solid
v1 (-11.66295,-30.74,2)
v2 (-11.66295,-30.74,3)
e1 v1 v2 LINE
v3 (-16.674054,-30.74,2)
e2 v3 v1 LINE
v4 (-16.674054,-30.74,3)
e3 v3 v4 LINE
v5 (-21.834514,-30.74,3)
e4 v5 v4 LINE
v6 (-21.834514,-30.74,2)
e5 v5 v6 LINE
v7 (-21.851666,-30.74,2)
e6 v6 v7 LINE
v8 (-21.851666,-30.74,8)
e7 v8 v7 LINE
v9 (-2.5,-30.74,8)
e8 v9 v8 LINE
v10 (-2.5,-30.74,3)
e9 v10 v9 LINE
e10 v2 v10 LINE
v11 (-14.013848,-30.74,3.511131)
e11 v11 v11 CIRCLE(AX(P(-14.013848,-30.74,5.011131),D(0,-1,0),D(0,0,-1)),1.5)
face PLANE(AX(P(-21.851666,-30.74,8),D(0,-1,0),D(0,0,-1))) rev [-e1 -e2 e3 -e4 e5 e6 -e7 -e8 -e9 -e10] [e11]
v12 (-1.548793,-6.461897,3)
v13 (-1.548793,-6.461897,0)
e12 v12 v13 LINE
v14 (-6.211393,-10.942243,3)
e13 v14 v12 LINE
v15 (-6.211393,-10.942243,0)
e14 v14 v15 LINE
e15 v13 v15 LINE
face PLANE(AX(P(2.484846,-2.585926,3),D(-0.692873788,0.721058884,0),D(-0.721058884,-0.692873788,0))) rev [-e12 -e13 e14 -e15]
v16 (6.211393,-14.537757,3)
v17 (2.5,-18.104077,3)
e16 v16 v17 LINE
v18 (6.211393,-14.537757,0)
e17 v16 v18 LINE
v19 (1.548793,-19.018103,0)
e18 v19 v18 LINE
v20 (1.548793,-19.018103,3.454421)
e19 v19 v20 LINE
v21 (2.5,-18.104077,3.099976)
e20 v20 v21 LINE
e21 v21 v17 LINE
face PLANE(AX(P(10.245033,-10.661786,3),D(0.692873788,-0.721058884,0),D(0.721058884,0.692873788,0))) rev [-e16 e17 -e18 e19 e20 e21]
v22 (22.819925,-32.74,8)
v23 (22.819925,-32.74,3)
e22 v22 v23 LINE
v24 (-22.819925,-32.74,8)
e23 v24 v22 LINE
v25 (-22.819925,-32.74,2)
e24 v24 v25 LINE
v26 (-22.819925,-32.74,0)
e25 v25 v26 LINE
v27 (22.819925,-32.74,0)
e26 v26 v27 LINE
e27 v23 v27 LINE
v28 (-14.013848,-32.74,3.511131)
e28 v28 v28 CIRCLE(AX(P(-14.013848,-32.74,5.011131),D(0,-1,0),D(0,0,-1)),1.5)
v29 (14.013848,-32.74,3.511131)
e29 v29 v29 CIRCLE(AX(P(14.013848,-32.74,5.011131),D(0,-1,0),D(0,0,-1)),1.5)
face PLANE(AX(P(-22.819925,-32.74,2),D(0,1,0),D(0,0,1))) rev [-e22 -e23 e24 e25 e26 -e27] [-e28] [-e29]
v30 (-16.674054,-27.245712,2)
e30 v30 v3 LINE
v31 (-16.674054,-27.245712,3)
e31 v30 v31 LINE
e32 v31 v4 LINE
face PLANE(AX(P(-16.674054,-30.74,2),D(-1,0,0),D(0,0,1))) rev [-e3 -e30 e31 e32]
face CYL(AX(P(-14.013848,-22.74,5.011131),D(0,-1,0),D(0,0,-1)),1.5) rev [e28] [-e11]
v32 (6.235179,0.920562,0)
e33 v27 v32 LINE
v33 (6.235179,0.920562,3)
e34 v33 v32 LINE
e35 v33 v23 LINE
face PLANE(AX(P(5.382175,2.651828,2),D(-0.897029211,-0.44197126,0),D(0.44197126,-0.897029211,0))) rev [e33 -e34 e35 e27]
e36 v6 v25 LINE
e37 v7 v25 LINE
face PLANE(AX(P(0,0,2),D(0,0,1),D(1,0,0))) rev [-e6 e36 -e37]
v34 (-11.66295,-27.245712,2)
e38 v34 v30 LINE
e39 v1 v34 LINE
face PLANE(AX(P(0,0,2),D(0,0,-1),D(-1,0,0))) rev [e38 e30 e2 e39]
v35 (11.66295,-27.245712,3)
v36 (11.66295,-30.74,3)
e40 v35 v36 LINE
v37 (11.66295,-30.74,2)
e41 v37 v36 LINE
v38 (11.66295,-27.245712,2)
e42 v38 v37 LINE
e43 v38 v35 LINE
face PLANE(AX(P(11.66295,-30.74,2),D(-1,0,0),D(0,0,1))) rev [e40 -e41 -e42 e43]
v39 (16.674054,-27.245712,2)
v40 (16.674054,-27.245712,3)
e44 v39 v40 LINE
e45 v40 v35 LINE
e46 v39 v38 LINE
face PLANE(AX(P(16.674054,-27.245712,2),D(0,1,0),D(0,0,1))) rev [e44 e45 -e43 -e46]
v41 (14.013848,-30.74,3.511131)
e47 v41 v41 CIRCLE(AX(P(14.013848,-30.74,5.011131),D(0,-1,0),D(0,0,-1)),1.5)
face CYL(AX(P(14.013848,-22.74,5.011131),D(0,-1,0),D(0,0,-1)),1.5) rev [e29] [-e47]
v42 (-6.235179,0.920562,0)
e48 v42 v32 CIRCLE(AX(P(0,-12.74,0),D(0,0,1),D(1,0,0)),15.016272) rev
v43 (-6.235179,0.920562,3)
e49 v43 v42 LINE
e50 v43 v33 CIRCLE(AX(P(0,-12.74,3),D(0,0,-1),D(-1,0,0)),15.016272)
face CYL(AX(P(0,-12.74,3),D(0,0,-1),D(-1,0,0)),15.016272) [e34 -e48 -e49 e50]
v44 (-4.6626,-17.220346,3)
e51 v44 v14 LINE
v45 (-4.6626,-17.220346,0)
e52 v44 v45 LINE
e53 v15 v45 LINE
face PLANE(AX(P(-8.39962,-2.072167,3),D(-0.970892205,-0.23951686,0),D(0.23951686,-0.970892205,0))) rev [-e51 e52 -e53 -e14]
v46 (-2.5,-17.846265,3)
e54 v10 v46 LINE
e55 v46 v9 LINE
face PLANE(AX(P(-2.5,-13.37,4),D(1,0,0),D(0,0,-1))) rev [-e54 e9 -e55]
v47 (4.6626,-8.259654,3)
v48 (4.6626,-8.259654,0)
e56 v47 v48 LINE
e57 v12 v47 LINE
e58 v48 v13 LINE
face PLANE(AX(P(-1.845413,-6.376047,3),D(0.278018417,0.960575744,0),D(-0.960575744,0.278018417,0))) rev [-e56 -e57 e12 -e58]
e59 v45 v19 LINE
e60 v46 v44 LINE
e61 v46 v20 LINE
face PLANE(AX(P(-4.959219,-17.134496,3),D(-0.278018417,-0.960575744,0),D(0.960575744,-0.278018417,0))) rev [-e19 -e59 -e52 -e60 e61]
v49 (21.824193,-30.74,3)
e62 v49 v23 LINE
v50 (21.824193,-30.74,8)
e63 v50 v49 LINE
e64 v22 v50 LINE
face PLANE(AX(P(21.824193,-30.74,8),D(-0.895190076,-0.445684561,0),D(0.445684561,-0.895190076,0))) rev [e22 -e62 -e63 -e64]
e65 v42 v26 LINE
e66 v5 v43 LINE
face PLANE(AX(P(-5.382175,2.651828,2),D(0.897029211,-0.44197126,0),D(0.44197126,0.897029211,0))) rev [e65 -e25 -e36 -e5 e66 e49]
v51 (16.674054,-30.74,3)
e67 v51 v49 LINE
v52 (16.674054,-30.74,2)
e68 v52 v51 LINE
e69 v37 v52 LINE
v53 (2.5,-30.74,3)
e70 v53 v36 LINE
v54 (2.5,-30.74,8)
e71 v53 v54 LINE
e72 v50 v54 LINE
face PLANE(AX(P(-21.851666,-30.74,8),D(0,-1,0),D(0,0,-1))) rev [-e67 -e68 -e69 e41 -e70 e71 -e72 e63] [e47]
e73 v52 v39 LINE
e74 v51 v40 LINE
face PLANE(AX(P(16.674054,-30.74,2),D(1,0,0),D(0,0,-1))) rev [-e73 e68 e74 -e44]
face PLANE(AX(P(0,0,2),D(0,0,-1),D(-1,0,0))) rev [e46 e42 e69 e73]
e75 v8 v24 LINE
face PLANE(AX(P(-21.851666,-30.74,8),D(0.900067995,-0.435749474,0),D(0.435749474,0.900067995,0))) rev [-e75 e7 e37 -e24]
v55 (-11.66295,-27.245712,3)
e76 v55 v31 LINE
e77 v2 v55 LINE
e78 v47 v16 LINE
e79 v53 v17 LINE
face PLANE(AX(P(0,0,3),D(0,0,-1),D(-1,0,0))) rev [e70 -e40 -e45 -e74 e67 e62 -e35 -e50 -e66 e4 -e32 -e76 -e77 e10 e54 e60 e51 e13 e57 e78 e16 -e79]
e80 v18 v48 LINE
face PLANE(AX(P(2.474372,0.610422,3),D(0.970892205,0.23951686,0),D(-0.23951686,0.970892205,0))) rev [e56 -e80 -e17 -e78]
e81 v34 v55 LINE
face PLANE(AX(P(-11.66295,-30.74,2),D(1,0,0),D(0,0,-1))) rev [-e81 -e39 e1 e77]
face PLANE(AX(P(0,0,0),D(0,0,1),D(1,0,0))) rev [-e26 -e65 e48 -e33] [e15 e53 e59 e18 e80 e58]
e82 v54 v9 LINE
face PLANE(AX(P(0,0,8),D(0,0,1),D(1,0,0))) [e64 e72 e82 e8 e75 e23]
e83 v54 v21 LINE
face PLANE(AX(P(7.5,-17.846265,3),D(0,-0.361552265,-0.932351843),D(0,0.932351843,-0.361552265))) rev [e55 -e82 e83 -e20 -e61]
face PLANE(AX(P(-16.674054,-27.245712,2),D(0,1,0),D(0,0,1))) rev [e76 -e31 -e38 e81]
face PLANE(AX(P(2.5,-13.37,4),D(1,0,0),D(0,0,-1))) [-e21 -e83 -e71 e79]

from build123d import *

# Parameters (mm, degrees)
SKETCH_1_R               = 3
EXTRUDE_1_DEPTH          = 2
EXTRUDE_2_DEPTH          = 6
RIB_2_REACH              = 42.702
SKETCH_3_WALL_W          = 109.004825052
SKETCH_3_WALL_H          = 5
SKETCH_4_R               = 4.101413307
EXTRUDE_3_DEPTH          = 2
EXTRUDE_4_DEPTH          = 3
CUT_EXTRUDE_1_DEPTH      = 41.220101475
CUT_EXTRUDE_1_DEPTH_BACK = 41.220101475
CUT_EXTRUDE_START        = -10
CUT_EXTRUDE_2_DEPTH      = 10
CUT_EXTRUDE_3_DEPTH      = 10
SKETCH_14_R              = 1.5
CUT_EXTRUDE_4_DEPTH      = 10
SKETCH_15_W              = 5.01110436
SKETCH_15_H              = 3.494287521
CUT_EXTRUDE_5_DEPTH      = 1


with BuildPart() as part:
    # 草图1 → 凸台-拉伸1 (new body)
    with BuildSketch(Plane.XY):
        with BuildLine():
            Line((-5.382175267, 2.651827558), (-22.819924686, -32.74))
            Line((-22.819924686, -32.74), (22.819924686, -32.74))
            Line((22.819924686, -32.74), (5.382175267, 2.651827558))
            ThreePointArc((5.382175267, 2.651827558), (0, 6), (-5.382175267, 2.651827558))
        make_face()
        Circle(SKETCH_1_R, mode=Mode.SUBTRACT)
    extrude(amount=EXTRUDE_1_DEPTH)

    # 草图2 → 凸台-拉伸2 (add)
    with BuildSketch(Plane.XY.offset(2)):
        Polygon((21.824193002, -30.74), (22.819924686, -32.74), (-22.819924686, -32.74), (-21.851665672, -30.74), align=None)
    extrude(amount=EXTRUDE_2_DEPTH)

    # 草图3 wall → 筋2 (add, up to next)
    with BuildSketch(Plane(origin=(0, -18.296150966, 5), x_dir=(0, -0.972147881588, 0.234368292061), z_dir=(0, -0.234368292061, -0.972147881588)), mode=Mode.PRIVATE) as rib_2_sk1:
        Rectangle(SKETCH_3_WALL_W, SKETCH_3_WALL_H)
    rib_2_tool1 = extrude(rib_2_sk1.sketch, amount=RIB_2_REACH, mode=Mode.PRIVATE) - part.part
    add(rib_2_tool1.solids().sort_by_distance((0, -18.296150966, 5))[0])

    # 草图4 → 凸台-拉伸3 (add)
    with BuildSketch(Plane.XY.offset(2)):
        Circle(SKETCH_4_R)
    extrude(amount=-EXTRUDE_3_DEPTH)

    # 草图9 → 凸台-拉伸4 (add)
    with BuildSketch(Plane(origin=(0, 0, 0), x_dir=(-1, 0, 0), z_dir=(0, 0, -1))):
        with BuildLine():
            Line((-6.23517922, 0.920562354), (-22.819924686, -32.74))
            Line((-22.819924686, -32.74), (22.819924686, -32.74))
            Line((22.819924686, -32.74), (6.23517922, 0.920562354))
            ThreePointArc((6.23517922, 0.920562354), (0, 2.276271965), (-6.23517922, 0.920562354))
        make_face()
        Polygon((6.21139304, -10.94224311), (4.662599656, -17.220345721), (-1.548793384, -19.018102611), (-6.21139304, -14.53775689), (-4.662599656, -8.259654279), (1.548793384, -6.461897389), align=None, mode=Mode.SUBTRACT)
    extrude(amount=-EXTRUDE_4_DEPTH)

    # 草图11 → 切除-拉伸1 (cut, two sides: drawn at the far end of the back side and taken through both)
    with BuildSketch(Plane.XY.offset(3).offset(-CUT_EXTRUDE_1_DEPTH_BACK)):
        Polygon((6.21139304, -14.53775689), (4.662599656, -8.259654279), (-1.548793384, -6.461897389), (-6.21139304, -10.94224311), (-4.662599656, -17.220345721), (1.548793384, -19.018102611), align=None)
    extrude(amount=CUT_EXTRUDE_1_DEPTH + CUT_EXTRUDE_1_DEPTH_BACK, mode=Mode.SUBTRACT)

    # 草图12 → 切除-拉伸2 (cut)
    with BuildSketch(Plane.XY.offset(3).offset(CUT_EXTRUDE_START)):
        with BuildLine():
            Line((14.504971028, 2.702486536), (10.280667783, -1.794850678))
            ThreePointArc((10.280667783, -1.794850678), (0.290112641, 2.273469232), (-9.850153994, -1.405852921))
            Line((-9.850153994, -1.405852921), (-13.409584794, 3.662670837))
            ThreePointArc((-13.409584794, 3.662670837), (0.728324257, 8.43390183), (14.504971028, 2.702486536))
        make_face()
    extrude(amount=CUT_EXTRUDE_2_DEPTH, mode=Mode.SUBTRACT)

    # 草图13 → 切除-拉伸3 (cut)
    with BuildSketch(Plane.ZY.offset(2.5)):
        Polygon((3, -17.846264642), (8, -30.74), (8, -17.846264642), (3.4065387, -17.846264642), align=None)
    extrude(amount=-CUT_EXTRUDE_3_DEPTH, mode=Mode.SUBTRACT)

    # 草图14 → 切除-拉伸4 (cut)
    with BuildSketch(Plane.XZ.offset(32.74)):
        with Locations((14.013848445, 5.011131475)):
            Circle(SKETCH_14_R)
        with Locations((-14.013847957, 5.011131475)):
            Circle(SKETCH_14_R)
    extrude(amount=-CUT_EXTRUDE_4_DEPTH, mode=Mode.SUBTRACT)

    # 草图15 → 切除-拉伸5 (cut)
    with BuildSketch(Plane.XY.offset(3)):
        with Locations((-14.168501734, -28.99285624)):
            Rectangle(SKETCH_15_W, SKETCH_15_H)
        with Locations((14.168501734, -28.99285624)):
            Rectangle(SKETCH_15_W, SKETCH_15_H)
    extrude(amount=-CUT_EXTRUDE_5_DEPTH, mode=Mode.SUBTRACT)


solid = part.part
